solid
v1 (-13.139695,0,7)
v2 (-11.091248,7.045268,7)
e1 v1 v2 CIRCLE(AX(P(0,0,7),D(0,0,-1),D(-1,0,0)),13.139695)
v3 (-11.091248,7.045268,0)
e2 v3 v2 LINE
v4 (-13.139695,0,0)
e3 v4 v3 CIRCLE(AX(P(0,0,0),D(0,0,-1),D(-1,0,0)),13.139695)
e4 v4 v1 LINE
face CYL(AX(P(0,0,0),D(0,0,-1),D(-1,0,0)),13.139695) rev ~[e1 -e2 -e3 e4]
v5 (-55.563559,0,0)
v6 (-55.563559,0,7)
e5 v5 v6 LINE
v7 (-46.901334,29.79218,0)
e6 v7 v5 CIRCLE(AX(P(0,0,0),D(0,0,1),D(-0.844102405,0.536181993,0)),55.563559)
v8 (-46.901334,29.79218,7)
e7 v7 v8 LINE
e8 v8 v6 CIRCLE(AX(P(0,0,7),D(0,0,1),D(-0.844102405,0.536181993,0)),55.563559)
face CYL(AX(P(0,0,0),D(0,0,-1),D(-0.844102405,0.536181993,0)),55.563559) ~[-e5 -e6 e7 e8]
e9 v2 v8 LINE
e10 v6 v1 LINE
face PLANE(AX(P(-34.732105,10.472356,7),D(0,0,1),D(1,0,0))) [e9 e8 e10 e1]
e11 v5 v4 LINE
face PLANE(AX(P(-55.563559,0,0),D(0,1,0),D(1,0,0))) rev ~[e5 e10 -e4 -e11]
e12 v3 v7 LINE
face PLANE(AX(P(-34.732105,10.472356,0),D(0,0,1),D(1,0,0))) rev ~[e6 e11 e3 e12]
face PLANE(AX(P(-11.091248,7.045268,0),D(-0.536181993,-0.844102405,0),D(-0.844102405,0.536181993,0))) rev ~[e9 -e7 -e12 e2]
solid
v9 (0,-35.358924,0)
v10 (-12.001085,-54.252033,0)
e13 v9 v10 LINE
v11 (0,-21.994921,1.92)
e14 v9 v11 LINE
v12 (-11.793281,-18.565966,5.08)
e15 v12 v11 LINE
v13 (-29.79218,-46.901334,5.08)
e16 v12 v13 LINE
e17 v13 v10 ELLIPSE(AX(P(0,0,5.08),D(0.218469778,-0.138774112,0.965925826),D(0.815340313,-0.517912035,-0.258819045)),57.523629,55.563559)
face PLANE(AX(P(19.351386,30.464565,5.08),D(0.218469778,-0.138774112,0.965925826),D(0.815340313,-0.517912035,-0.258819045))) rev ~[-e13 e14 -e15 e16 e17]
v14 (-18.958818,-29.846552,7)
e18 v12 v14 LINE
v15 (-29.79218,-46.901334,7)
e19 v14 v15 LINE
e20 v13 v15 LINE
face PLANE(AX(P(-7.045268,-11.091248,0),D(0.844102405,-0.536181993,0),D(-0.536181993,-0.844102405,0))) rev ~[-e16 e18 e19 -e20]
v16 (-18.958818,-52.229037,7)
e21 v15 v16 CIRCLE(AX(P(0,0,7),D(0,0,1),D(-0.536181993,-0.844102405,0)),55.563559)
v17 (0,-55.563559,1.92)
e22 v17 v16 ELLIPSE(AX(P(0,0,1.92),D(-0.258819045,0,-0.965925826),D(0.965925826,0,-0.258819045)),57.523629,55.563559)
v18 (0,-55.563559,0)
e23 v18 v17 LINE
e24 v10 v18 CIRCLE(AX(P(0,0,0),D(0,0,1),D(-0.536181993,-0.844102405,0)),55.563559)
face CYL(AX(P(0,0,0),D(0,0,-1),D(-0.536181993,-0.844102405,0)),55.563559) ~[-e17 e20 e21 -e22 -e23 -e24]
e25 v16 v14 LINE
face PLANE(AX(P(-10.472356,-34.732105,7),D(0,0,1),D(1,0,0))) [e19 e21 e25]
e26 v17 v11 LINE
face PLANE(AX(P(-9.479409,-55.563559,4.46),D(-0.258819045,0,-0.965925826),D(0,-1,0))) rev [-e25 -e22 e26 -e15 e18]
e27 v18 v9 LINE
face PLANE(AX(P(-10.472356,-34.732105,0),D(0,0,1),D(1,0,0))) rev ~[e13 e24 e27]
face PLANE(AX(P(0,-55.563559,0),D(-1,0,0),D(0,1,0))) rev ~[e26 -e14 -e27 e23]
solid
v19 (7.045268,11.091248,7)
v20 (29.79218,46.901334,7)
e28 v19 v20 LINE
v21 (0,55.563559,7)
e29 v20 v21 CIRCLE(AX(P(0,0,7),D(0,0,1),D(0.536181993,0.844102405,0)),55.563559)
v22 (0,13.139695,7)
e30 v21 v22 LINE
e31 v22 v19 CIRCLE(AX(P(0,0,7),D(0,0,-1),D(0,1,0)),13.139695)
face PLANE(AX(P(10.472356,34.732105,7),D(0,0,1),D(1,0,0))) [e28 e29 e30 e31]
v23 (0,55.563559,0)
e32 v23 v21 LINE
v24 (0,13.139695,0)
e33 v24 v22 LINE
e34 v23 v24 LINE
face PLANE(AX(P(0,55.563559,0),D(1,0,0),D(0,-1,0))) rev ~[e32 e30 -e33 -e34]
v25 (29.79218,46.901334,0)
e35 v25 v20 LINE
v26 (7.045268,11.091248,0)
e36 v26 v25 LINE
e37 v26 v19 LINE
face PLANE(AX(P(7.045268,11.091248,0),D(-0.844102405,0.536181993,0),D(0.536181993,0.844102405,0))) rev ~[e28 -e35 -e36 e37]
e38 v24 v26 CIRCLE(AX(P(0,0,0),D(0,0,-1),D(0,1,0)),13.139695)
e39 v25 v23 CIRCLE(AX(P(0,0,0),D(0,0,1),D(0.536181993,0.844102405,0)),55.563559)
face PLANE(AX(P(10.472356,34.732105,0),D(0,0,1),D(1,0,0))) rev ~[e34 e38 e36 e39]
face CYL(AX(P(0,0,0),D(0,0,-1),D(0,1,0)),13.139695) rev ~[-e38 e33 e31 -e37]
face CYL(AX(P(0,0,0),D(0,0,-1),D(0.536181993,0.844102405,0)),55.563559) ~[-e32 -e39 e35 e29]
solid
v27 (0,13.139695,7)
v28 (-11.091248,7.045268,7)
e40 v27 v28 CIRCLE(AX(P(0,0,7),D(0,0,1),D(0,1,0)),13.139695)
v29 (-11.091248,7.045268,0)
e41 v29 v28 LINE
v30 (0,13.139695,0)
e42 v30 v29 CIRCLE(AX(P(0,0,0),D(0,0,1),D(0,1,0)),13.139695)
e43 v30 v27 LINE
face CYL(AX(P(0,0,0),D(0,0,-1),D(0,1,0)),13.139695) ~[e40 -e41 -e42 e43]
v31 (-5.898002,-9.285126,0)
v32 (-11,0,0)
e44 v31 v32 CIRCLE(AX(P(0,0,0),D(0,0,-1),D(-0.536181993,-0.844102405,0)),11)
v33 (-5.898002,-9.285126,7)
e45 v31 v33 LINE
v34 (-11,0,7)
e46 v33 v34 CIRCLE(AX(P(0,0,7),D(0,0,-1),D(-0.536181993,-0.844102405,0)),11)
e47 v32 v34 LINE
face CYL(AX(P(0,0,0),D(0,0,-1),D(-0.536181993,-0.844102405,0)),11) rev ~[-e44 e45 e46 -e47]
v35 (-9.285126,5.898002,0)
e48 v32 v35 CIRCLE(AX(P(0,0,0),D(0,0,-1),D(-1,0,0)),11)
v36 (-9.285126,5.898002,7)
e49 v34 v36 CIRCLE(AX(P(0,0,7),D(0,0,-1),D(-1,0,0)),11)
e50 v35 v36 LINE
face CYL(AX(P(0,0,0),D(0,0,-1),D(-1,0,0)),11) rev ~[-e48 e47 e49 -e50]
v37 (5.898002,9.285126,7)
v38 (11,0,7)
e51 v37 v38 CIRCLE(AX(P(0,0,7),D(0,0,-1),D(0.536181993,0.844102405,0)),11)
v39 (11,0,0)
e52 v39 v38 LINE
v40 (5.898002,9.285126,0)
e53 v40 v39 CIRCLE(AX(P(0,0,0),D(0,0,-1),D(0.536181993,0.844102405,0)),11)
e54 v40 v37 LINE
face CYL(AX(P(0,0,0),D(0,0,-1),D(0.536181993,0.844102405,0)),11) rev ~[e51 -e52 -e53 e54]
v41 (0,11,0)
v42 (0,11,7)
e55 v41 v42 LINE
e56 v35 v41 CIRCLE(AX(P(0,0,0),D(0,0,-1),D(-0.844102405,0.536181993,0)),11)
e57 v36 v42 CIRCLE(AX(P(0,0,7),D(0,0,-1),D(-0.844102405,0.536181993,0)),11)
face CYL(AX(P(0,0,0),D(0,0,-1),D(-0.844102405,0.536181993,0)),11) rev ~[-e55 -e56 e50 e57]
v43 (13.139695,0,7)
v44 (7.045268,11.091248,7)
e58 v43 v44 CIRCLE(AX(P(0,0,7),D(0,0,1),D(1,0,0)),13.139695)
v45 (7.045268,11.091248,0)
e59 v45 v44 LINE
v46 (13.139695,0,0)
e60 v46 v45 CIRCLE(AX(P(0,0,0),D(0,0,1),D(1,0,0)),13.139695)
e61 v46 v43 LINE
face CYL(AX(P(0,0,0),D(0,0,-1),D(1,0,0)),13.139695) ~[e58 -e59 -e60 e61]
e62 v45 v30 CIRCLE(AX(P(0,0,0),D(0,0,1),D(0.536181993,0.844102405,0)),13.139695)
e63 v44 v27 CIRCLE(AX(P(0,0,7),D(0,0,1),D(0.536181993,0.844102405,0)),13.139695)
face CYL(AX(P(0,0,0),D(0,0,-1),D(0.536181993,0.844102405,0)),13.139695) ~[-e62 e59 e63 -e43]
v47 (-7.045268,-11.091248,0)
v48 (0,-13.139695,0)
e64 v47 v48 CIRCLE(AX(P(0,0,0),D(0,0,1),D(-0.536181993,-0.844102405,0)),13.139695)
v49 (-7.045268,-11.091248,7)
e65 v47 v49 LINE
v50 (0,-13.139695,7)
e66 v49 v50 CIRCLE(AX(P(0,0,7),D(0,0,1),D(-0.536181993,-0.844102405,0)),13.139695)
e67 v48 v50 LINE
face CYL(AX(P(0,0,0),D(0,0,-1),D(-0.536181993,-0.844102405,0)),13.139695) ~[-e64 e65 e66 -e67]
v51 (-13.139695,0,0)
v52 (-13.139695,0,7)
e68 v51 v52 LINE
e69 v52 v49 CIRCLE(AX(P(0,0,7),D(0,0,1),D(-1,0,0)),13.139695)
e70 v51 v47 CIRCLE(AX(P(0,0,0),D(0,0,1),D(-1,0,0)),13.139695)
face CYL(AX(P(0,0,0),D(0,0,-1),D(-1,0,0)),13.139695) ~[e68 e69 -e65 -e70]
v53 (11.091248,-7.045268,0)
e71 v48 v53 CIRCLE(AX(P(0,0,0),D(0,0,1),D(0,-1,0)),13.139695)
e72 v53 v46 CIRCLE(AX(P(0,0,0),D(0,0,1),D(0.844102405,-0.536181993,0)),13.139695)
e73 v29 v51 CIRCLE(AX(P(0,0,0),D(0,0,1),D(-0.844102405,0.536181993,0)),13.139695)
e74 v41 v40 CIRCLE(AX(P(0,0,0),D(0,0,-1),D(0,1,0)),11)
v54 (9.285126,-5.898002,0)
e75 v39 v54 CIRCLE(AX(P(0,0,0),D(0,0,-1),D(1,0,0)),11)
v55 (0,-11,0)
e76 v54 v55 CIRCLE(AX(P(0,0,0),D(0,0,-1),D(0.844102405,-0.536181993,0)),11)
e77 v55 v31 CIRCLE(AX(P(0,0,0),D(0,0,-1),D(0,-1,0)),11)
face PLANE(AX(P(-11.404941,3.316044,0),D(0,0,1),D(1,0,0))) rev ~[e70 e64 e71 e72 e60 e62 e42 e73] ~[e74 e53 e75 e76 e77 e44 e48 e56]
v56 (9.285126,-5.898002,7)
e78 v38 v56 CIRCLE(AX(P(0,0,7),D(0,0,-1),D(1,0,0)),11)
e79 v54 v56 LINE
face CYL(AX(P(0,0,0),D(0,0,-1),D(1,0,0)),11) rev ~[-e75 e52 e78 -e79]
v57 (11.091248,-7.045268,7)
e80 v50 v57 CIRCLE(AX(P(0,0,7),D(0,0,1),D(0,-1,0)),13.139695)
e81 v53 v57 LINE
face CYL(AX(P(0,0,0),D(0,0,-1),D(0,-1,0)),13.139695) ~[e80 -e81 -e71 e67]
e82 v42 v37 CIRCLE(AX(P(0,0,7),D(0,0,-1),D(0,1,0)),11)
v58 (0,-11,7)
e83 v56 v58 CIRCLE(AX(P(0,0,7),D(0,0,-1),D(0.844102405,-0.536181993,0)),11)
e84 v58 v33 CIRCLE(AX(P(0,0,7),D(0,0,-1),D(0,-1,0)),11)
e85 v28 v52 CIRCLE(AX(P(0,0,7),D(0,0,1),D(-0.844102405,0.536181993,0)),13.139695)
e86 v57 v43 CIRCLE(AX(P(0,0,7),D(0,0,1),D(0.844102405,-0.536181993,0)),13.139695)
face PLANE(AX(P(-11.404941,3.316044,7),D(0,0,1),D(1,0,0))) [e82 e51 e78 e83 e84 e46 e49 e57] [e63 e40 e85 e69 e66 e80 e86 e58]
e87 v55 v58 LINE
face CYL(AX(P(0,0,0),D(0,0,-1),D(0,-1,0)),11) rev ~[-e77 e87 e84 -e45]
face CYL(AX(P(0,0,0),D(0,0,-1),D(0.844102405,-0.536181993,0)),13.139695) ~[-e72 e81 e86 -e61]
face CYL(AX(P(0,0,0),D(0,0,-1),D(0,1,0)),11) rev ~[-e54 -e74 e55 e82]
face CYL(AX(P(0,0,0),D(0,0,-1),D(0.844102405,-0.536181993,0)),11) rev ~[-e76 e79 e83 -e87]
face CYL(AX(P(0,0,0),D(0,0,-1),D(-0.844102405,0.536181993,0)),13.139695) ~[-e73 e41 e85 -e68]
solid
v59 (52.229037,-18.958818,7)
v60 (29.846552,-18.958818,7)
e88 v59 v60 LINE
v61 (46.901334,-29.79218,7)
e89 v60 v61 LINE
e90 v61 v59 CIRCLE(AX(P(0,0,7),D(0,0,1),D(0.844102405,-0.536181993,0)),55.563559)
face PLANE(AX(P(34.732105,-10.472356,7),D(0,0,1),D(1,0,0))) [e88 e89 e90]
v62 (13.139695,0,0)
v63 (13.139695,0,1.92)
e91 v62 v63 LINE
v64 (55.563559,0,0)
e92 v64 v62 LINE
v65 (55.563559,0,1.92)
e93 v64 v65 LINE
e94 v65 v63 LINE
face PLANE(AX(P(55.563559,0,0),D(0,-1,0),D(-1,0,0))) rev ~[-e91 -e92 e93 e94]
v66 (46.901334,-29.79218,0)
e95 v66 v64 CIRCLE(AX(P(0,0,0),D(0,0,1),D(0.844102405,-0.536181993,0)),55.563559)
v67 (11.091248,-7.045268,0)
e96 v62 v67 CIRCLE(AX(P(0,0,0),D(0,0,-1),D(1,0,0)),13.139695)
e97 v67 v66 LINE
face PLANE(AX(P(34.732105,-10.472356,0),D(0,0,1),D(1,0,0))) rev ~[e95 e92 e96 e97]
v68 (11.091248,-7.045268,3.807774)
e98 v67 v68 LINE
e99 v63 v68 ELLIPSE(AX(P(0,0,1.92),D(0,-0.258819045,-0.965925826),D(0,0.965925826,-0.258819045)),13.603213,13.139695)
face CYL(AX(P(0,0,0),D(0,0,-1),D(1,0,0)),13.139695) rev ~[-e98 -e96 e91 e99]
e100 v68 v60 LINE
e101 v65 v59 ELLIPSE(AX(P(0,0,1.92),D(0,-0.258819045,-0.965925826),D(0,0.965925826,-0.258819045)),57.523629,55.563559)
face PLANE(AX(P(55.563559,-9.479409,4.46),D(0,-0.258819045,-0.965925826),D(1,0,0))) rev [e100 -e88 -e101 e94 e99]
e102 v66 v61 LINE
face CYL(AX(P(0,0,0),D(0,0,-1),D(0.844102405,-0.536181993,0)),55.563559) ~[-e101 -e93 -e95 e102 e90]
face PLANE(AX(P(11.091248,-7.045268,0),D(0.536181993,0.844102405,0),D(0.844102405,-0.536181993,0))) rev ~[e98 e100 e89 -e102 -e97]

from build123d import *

# Parameters (mm, degrees)
F1_DEPTH    = 7
F2_DEPTH    = 7
F3_SIZE2    = 18.9588181024
F3_SIZE     = 5.08
F3_2_SIZE2  = 18.9588181024
F3_2_SIZE   = 5.08
F4_T1_DEPTH = 140.8854077886


# Not quite as in the source:
# - a fillet or chamfer that OpenCascade refuses, or shapes differently, is made with other operations: its cross-section is extruded or revolved along the edge and cut away or added


with BuildPart() as f1:
    # F0 (on Top) → F1 (new body)
    with BuildSketch(Plane.XY):
        with BuildLine():
            Line((-13.1396949858, 0), (-11, 0))
            ThreePointArc((-11, 0), (-10.5625846979, 3.0711243054), (-9.2851264546, 5.8980019262))
            Line((-9.2851264546, 5.8980019262), (-11.0912481381, 7.0452678487))
            ThreePointArc((-11.0912481381, 7.0452678487), (-12.6171946539, 3.6685124216), (-13.1396949858, 0))
        make_face()
        with BuildLine():
            ThreePointArc((-9.2851264546, 5.8980019262), (-5.2972624445, 9.640488089), (0, 11))
            Line((0, 11), (0, 13.1396949858))
            ThreePointArc((0, 13.1396949858), (-6.3276738891, 11.5157339094), (-11.0912481381, 7.0452678487))
            Line((-11.0912481381, 7.0452678487), (-9.2851264546, 5.8980019262))
        make_face()
        with BuildLine():
            ThreePointArc((0, 11), (3.0711243054, 10.5625846979), (5.8980019262, 9.2851264546))
            Line((5.8980019262, 9.2851264546), (7.0452678487, 11.0912481381))
            ThreePointArc((7.0452678487, 11.0912481381), (3.6685124216, 12.6171946539), (0, 13.1396949858))
            Line((0, 13.1396949858), (0, 11))
        make_face()
        with BuildLine():
            ThreePointArc((5.8980019262, 9.2851264546), (9.640488089, 5.2972624445), (11, 0))
            Line((11, 0), (13.1396949858, 0))
            ThreePointArc((13.1396949858, 0), (11.5157339094, 6.3276738891), (7.0452678487, 11.0912481381))
            Line((7.0452678487, 11.0912481381), (5.8980019262, 9.2851264546))
        make_face()
        with BuildLine():
            Line((13.1396949858, 0), (11, 0))
            ThreePointArc((11, 0), (10.5625846979, -3.0711243054), (9.2851264546, -5.8980019262))
            Line((9.2851264546, -5.8980019262), (11.0912481381, -7.0452678487))
            ThreePointArc((11.0912481381, -7.0452678487), (12.6171946539, -3.6685124216), (13.1396949858, 0))
        make_face()
        with BuildLine():
            Line((11.0912481381, -7.0452678487), (9.2851264546, -5.8980019262))
            ThreePointArc((9.2851264546, -5.8980019262), (5.2972624445, -9.640488089), (0, -11))
            Line((0, -11), (0, -13.1396949858))
            ThreePointArc((0, -13.1396949858), (6.3276738891, -11.5157339094), (11.0912481381, -7.0452678487))
        make_face()
        with BuildLine():
            Line((0, -13.1396949858), (0, -11))
            ThreePointArc((0, -11), (-3.0711243054, -10.5625846979), (-5.8980019262, -9.2851264546))
            Line((-5.8980019262, -9.2851264546), (-7.0452678487, -11.0912481381))
            ThreePointArc((-7.0452678487, -11.0912481381), (-3.6685124216, -12.6171946539), (0, -13.1396949858))
        make_face()
        with BuildLine():
            ThreePointArc((-5.8980019262, -9.2851264546), (-9.640488089, -5.2972624445), (-11, 0))
            Line((-11, 0), (-13.1396949858, 0))
            ThreePointArc((-13.1396949858, 0), (-11.5157339094, -6.3276738891), (-7.0452678487, -11.0912481381))
            Line((-7.0452678487, -11.0912481381), (-5.8980019262, -9.2851264546))
        make_face()
    extrude(amount=F1_DEPTH)


with BuildPart() as f2:
    # F0 (on Top) → F2 (new body)
    with BuildSketch(Plane.XY):
        with BuildLine():
            ThreePointArc((0, 13.1396949858), (3.6685124216, 12.6171946539), (7.0452678487, 11.0912481381))
            Line((7.0452678487, 11.0912481381), (29.7921797922, 46.9013337383))
            Line((29.7921797922, 46.9013337383), (0, 53.34))
            Line((0, 53.34), (0, 13.1396949858))
        make_face()
        with BuildLine():
            Line((0, 53.34), (29.7921797922, 46.9013337383))
            ThreePointArc((29.7921797922, 46.9013337383), (15.5129633081, 53.3540725025), (0, 55.5635589501))
            Line((0, 55.5635589501), (0, 53.34))
        make_face()
    extrude(amount=F2_DEPTH)


with BuildPart() as f2b:
    # F0 (on Top) → F2, piece 2 (new body)
    with BuildSketch(Plane.XY):
        with BuildLine():
            Line((-53.34, 0), (-13.1396949858, 0))
            ThreePointArc((-13.1396949858, 0), (-12.6171946539, 3.6685124216), (-11.0912481381, 7.0452678487))
            Line((-11.0912481381, 7.0452678487), (-46.9013337383, 29.7921797922))
            Line((-46.9013337383, 29.7921797922), (-53.34, 0))
        make_face()
        with BuildLine():
            Line((-55.5635589501, 0), (-53.34, 0))
            Line((-53.34, 0), (-46.9013337383, 29.7921797922))
            ThreePointArc((-46.9013337383, 29.7921797922), (-53.3540725025, 15.5129633081), (-55.5635589501, 0))
        make_face()
    extrude(amount=F2_DEPTH)


with BuildPart() as f2c:
    # F0 (on Top) → F2, piece 3 (new body)
    with BuildSketch(Plane.XY):
        with BuildLine():
            Line((0, -53.34), (0, -13.1396949858))
            ThreePointArc((0, -13.1396949858), (-3.6685124216, -12.6171946539), (-7.0452678487, -11.0912481381))
            Line((-7.0452678487, -11.0912481381), (-29.7921797922, -46.9013337383))
            Line((-29.7921797922, -46.9013337383), (0, -53.34))
        make_face()
        with BuildLine():
            Line((0, -55.5635589501), (0, -53.34))
            Line((0, -53.34), (-29.7921797922, -46.9013337383))
            ThreePointArc((-29.7921797922, -46.9013337383), (-15.5129633081, -53.3540725025), (0, -55.5635589501))
        make_face()
    extrude(amount=F2_DEPTH)

    # F3
    f3_edges = [f2c.edges().sort_by_distance(p)[0] for p in [
        (0, -34.351627, 7),
    ]]
    f3_side = f2c.faces().sort_by_distance((0, -34.351627, 3.5))[0]
    chamfer(f3_edges, length=F3_SIZE, length2=F3_SIZE2, reference=f3_side)

    # F4: chamfer of 5.08 x 18.9588181024 on 1 edges, made by hand

    # F4_s2 → F4_t1 (cut)
    with BuildSketch(Plane(origin=(19.3513855664, 30.4645648313, 0), x_dir=(0, 0, 1), z_dir=(-0.5361819933, -0.844102405, 0))):
        Polygon((5.08, 0), (0, -18.9588181024), (0, 0), align=None)
    extrude(amount=F4_T1_DEPTH, mode=Mode.SUBTRACT)


with BuildPart() as f2d:
    # F0 (on Top) → F2, piece 4 (new body)
    with BuildSketch(Plane.XY):
        with BuildLine():
            Line((53.34, 0), (13.1396949858, 0))
            ThreePointArc((13.1396949858, 0), (12.6171946539, -3.6685124216), (11.0912481381, -7.0452678487))
            Line((11.0912481381, -7.0452678487), (46.9013337383, -29.7921797922))
            Line((46.9013337383, -29.7921797922), (53.34, 0))
        make_face()
        with BuildLine():
            Line((55.5635589501, 0), (53.34, 0))
            Line((53.34, 0), (46.9013337383, -29.7921797922))
            ThreePointArc((46.9013337383, -29.7921797922), (53.3540725025, -15.5129633081), (55.5635589501, 0))
        make_face()
    extrude(amount=F2_DEPTH)

    # F3#2
    f3_2_edges = [f2d.edges().sort_by_distance(p)[0] for p in [
        (34.351627, 0, 7),
    ]]
    f3_2_side = f2d.faces().sort_by_distance((34.351627, 0, 3.5))[0]
    chamfer(f3_2_edges, length=F3_2_SIZE, length2=F3_2_SIZE2, reference=f3_2_side)


solid = Compound([f1.part, f2.part, f2b.part, f2c.part, f2d.part])
